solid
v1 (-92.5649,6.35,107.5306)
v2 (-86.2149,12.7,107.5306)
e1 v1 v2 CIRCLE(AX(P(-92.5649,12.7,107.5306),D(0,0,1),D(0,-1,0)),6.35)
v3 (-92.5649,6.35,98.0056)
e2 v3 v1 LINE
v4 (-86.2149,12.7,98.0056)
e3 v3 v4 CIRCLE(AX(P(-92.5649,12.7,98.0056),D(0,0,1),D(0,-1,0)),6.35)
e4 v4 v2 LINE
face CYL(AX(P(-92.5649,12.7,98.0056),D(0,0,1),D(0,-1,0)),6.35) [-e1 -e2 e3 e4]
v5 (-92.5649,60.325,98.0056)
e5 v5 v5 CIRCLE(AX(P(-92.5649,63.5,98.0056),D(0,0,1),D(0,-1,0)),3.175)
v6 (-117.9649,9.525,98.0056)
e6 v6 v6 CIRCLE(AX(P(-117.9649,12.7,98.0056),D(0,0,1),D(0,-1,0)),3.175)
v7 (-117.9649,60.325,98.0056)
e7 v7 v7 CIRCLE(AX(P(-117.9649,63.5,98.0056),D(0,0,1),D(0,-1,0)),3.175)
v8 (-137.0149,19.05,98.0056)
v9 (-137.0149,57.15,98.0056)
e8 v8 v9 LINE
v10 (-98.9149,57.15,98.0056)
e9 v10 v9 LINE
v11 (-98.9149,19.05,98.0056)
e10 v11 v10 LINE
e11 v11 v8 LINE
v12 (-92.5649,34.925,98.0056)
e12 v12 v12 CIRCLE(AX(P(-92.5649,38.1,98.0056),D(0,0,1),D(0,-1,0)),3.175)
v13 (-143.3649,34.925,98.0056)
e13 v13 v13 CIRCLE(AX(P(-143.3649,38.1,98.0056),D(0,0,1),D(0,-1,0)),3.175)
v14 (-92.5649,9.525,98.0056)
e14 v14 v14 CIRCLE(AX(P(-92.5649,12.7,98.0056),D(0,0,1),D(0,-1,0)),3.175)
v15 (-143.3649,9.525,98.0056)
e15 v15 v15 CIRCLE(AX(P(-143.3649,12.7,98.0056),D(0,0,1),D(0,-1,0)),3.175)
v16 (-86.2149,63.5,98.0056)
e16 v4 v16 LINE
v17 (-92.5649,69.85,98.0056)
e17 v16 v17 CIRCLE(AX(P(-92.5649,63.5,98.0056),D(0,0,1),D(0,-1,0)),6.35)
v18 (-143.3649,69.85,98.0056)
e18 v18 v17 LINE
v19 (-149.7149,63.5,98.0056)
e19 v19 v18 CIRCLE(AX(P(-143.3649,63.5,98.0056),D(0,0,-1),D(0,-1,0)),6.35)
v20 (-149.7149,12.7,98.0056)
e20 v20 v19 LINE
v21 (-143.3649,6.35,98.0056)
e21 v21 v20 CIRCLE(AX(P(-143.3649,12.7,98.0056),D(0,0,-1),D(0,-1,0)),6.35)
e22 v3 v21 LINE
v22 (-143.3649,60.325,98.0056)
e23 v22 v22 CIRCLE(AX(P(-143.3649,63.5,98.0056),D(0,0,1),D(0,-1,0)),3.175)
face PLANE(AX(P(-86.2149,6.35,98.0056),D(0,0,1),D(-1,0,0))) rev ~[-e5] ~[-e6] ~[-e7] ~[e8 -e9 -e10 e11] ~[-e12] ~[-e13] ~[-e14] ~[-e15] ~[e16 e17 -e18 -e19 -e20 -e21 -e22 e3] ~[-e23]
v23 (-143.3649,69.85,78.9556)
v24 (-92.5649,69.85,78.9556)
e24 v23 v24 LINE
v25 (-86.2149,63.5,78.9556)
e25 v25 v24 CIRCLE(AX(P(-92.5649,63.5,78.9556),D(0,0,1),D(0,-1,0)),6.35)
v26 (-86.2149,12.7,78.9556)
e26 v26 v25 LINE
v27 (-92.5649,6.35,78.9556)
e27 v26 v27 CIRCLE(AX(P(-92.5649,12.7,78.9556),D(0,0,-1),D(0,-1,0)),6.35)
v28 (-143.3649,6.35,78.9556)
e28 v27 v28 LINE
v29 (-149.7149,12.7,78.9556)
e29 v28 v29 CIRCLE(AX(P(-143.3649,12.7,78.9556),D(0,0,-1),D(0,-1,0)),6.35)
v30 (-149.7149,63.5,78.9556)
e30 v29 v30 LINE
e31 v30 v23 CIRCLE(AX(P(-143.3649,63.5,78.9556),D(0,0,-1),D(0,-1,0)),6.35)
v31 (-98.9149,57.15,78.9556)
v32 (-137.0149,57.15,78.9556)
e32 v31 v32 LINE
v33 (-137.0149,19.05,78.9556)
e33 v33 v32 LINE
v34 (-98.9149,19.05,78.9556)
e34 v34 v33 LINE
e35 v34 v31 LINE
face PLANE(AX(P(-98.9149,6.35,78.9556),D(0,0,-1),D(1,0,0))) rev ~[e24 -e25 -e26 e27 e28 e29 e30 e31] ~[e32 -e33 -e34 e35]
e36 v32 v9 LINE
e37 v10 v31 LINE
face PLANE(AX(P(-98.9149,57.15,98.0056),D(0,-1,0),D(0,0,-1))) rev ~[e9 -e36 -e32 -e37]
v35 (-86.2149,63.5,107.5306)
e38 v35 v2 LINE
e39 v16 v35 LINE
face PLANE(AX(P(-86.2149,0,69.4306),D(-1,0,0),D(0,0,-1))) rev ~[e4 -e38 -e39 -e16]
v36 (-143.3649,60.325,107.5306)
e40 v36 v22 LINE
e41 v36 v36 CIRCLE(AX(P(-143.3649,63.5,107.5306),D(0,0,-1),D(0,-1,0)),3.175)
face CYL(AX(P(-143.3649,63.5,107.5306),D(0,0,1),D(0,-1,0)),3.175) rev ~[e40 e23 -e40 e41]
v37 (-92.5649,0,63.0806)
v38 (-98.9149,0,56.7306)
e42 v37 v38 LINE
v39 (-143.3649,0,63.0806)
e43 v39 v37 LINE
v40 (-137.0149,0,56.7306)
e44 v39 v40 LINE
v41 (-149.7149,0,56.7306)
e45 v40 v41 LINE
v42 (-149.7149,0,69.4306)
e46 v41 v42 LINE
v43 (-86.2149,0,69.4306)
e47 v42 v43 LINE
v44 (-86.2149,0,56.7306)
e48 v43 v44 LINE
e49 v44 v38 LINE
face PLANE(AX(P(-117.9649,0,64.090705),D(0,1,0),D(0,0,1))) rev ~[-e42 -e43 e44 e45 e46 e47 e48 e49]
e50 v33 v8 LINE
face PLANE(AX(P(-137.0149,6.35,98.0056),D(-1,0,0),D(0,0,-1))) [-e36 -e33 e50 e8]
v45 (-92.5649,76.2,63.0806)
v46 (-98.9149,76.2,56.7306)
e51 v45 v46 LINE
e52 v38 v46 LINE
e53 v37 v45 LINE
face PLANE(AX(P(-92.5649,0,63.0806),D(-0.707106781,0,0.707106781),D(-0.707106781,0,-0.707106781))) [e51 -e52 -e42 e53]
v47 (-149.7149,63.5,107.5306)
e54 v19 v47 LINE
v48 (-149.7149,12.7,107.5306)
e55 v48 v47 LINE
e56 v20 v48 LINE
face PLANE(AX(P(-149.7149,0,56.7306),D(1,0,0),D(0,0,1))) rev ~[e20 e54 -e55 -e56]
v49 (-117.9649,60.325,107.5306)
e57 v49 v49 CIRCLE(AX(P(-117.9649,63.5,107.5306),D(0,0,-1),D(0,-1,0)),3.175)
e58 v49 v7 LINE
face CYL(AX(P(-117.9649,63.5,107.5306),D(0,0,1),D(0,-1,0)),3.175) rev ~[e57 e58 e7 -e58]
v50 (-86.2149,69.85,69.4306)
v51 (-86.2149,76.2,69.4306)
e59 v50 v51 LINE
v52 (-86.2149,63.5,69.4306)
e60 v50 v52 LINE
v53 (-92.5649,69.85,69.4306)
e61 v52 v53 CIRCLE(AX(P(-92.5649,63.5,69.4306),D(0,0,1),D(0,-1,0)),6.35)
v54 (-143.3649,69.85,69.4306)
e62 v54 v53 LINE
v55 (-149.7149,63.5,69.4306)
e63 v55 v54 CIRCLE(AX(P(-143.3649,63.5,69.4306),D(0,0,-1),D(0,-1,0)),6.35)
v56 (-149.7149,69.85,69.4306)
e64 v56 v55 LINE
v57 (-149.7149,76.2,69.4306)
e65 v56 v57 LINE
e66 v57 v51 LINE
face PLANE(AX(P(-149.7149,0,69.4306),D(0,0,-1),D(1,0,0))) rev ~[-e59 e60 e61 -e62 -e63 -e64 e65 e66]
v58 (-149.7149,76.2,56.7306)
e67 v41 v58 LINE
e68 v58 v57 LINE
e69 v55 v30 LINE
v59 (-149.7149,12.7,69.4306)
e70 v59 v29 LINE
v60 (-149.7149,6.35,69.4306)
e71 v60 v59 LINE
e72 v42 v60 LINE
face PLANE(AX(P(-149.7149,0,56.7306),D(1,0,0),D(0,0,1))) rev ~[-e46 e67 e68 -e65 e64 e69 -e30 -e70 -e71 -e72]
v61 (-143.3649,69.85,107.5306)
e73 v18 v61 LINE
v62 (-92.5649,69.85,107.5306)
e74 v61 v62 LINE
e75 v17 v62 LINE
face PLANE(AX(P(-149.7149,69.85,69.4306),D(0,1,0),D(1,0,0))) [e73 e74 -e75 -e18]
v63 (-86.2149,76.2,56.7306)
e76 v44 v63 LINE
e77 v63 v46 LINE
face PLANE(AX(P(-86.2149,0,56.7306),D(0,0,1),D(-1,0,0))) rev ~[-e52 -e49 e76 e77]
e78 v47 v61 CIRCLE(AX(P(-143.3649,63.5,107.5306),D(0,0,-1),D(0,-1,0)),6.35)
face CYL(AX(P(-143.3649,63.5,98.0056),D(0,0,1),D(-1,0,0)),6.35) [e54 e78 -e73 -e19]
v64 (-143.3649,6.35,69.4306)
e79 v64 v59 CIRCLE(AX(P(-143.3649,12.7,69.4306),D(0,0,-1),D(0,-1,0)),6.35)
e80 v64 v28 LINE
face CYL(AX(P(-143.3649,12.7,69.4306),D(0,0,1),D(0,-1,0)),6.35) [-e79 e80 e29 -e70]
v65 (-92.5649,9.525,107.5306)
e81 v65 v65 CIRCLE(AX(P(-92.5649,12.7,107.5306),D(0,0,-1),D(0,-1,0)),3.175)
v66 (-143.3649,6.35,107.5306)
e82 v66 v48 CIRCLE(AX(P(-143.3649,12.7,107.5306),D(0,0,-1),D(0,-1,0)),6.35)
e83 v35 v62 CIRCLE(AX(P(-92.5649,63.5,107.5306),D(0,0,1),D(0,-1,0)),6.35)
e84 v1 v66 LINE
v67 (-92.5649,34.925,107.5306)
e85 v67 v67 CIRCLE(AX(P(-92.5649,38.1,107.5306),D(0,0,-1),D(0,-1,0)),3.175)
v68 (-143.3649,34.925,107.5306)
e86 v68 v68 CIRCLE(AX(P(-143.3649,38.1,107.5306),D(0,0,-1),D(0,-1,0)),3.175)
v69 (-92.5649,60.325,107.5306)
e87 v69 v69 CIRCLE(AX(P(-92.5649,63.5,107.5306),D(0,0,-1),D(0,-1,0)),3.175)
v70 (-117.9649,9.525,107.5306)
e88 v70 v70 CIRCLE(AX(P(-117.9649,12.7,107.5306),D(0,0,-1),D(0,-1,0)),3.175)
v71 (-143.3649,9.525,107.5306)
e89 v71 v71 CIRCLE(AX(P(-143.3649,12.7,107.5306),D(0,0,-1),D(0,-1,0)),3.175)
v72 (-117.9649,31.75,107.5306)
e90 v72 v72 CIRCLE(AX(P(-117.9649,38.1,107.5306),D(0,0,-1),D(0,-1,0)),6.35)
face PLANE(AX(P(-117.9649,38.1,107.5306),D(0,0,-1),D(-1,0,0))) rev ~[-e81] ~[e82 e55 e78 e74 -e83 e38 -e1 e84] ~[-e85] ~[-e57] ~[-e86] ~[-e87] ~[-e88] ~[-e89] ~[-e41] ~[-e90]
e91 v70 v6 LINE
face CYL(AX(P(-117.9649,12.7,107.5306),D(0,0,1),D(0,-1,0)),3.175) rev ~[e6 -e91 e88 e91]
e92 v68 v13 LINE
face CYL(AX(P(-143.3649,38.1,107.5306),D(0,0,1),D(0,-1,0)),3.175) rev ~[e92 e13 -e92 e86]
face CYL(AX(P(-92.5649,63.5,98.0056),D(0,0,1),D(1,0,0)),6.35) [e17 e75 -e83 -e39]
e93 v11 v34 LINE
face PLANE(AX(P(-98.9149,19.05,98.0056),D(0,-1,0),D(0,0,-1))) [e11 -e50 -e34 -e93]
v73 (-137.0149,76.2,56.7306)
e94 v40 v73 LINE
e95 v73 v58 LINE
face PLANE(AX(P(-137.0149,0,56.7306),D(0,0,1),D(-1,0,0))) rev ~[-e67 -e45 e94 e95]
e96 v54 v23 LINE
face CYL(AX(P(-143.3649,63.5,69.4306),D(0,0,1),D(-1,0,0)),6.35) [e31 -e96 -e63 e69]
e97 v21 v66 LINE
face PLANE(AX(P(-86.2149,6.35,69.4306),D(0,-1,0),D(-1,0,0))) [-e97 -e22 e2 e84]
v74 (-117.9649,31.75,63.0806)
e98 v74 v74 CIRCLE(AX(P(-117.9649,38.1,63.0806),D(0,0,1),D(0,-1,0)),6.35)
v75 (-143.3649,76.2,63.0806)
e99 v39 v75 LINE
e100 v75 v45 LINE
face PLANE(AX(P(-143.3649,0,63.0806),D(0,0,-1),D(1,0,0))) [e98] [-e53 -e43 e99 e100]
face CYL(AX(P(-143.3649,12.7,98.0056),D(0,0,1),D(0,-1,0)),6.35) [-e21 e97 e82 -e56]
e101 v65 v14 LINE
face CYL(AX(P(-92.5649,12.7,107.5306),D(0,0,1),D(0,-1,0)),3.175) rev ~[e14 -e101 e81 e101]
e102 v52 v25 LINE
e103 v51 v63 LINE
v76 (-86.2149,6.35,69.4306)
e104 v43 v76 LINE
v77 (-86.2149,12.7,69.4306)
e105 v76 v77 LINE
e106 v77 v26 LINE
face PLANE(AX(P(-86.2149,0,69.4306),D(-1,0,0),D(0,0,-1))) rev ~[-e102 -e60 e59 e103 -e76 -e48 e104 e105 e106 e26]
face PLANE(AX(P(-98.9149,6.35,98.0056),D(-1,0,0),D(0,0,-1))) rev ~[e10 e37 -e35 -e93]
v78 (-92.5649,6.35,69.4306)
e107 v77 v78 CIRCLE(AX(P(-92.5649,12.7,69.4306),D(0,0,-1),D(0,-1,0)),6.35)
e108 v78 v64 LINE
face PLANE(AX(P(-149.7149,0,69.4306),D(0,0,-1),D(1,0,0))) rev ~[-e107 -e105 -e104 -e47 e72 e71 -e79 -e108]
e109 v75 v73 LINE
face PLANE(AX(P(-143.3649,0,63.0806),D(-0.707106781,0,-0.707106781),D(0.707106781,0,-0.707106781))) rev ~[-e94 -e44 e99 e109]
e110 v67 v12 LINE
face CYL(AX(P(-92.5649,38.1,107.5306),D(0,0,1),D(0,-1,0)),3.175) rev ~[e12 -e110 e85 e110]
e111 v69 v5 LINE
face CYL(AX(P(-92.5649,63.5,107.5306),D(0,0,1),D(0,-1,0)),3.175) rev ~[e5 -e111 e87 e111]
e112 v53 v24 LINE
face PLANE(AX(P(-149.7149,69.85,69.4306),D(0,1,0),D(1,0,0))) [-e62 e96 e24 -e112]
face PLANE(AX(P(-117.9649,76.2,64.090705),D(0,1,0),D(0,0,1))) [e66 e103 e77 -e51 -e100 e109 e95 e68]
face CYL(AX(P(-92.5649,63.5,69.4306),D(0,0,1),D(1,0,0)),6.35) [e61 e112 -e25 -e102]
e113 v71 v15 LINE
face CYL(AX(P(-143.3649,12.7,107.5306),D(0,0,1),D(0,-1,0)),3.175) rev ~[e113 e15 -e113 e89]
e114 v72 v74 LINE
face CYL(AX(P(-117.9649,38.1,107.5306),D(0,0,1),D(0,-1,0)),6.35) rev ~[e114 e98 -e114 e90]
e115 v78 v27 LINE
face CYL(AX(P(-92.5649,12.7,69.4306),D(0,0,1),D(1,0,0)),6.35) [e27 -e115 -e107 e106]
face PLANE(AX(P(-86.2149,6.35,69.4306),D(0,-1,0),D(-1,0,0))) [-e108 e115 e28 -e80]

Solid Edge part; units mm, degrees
sketch "Sketch1" plane through (0, 0, 0) normal (0, -1, 0) x (1, 0, 0)
  line L0 (-149.7149, 69.4306) -> (-86.2149, 69.4306)
  line L1 (-86.2149, 69.4306) -> (-86.2149, 56.7306)
  line L2 (-86.2149, 56.7306) -> (-98.9149, 56.7306)
  line L3 (-92.5649, 63.0806) -> (-98.9149, 56.7306)
  line L4 (-143.3649, 63.0806) -> (-92.5649, 63.0806)
  line L5 (-143.3649, 63.0806) -> (-137.0149, 56.7306)
  line L6 (-137.0149, 56.7306) -> (-149.7149, 56.7306)
  line L7 (-149.7149, 56.7306) -> (-149.7149, 69.4306)
extrude "Protrusion1" add sketch "Sketch1" against normal blind 76.2
sketch "Sketch2" plane through (-117.9649, 38.1, 69.4306) normal (0, 0, 1) x (1, 0, 0)
  line L0 (31.75, -31.75) -> (-31.75, -31.75)
  line L1 (-31.75, -31.75) -> (-31.75, 31.75)
  line L2 (-31.75, 31.75) -> (31.75, 31.75)
  line L3 (31.75, 31.75) -> (31.75, -31.75)
extrude "ExtrudedProtrusion_2" add sketch "Sketch2" along normal blind 38.1
sketch "Sketch3" plane through (-117.9649, 6.35, 88.4806) normal (0, -1, 0) x (1, 0, 0)
  line L0 (-31.75, -9.525) -> (-19.05, -9.525)
  line L1 (-19.05, 9.525) -> (-19.05, -9.525)
  line L2 (-31.75, 9.525) -> (-19.05, 9.525)
extrude "Cutout1" cut sketch "Sketch3" against normal through all material side at (-143.3649, 6.35, 79.0056)
sketch "Sketch4" plane through (-117.9649, 6.35, 88.4806) normal (0, -1, 0) x (1, 0, 0)
  line L0 (19.05, -9.525) -> (31.75, -9.525)
  line L1 (19.05, 9.525) -> (19.05, -9.525)
  line L2 (31.75, 9.525) -> (19.05, 9.525)
extrude "Cutout2" cut sketch "Sketch4" against normal through all material side at (-92.5649, 6.35, 79.0056)
sketch "Sketch5" plane through (-98.9149, 38.1, 88.4806) normal (1, 0, 0) x (0, 0, -1)
  line L0 (-9.525, 19.05) -> (9.525, 19.05)
  line L1 (9.525, 19.05) -> (9.525, 31.75)
  line L2 (9.525, 31.75) -> (-9.525, 31.75)
  line L3 (-9.525, 31.75) -> (-9.525, 19.05)
  line L4 (-9.525, -19.05) -> (9.525, -19.05)
  line L5 (9.525, -19.05) -> (9.525, -31.75)
  line L6 (9.525, -31.75) -> (-9.525, -31.75)
  line L7 (-9.525, -31.75) -> (-9.525, -19.05)
extrude "Cutout3" cut sketch "Sketch5" against normal through all
hole "Hole_2" at (-92.5649, 63.5, 107.5306) direction (0, 0, -1) diameter 6.35 end up to next
hole "Hole_11" at (-117.9649, 63.5, 107.5306) direction (0, 0, -1) diameter 6.35 end up to next
hole "Hole1" at (-143.3649, 63.5, 107.5306) direction (0, 0, -1) diameter 6.35 end up to next
hole "Hole2" at (-143.3649, 38.1, 107.5306) direction (0, 0, -1) diameter 6.35 end up to next
hole "Hole3" at (-143.3649, 12.7, 107.5306) direction (0, 0, -1) diameter 6.35 end up to next
hole "Hole4" at (-117.9649, 12.7, 107.5306) direction (0, 0, -1) diameter 6.35 end up to next
hole "Hole5" at (-92.5649, 12.7, 107.5306) direction (0, 0, -1) diameter 6.35 end up to next
hole "Hole6" at (-92.5649, 38.1, 107.5306) direction (0, 0, -1) diameter 6.35 end up to next
hole "Hole_18" at (-117.9649, 38.1, 107.5306) direction (0, 0, -1) diameter 12.7 end up to next
fillet "Round_1" radius 6.35 8 edges at (-149.7149, 69.85, 74.1931) (-149.7149, 6.35, 74.1931) (-86.2149, 69.85, 74.1931) (-86.2149, 6.35, 74.1931) (-149.7149, 6.35, 102.7681) (-149.7149, 69.85, 102.7681) (-86.2149, 6.35, 102.7681) (-86.2149, 69.85, 102.7681)
